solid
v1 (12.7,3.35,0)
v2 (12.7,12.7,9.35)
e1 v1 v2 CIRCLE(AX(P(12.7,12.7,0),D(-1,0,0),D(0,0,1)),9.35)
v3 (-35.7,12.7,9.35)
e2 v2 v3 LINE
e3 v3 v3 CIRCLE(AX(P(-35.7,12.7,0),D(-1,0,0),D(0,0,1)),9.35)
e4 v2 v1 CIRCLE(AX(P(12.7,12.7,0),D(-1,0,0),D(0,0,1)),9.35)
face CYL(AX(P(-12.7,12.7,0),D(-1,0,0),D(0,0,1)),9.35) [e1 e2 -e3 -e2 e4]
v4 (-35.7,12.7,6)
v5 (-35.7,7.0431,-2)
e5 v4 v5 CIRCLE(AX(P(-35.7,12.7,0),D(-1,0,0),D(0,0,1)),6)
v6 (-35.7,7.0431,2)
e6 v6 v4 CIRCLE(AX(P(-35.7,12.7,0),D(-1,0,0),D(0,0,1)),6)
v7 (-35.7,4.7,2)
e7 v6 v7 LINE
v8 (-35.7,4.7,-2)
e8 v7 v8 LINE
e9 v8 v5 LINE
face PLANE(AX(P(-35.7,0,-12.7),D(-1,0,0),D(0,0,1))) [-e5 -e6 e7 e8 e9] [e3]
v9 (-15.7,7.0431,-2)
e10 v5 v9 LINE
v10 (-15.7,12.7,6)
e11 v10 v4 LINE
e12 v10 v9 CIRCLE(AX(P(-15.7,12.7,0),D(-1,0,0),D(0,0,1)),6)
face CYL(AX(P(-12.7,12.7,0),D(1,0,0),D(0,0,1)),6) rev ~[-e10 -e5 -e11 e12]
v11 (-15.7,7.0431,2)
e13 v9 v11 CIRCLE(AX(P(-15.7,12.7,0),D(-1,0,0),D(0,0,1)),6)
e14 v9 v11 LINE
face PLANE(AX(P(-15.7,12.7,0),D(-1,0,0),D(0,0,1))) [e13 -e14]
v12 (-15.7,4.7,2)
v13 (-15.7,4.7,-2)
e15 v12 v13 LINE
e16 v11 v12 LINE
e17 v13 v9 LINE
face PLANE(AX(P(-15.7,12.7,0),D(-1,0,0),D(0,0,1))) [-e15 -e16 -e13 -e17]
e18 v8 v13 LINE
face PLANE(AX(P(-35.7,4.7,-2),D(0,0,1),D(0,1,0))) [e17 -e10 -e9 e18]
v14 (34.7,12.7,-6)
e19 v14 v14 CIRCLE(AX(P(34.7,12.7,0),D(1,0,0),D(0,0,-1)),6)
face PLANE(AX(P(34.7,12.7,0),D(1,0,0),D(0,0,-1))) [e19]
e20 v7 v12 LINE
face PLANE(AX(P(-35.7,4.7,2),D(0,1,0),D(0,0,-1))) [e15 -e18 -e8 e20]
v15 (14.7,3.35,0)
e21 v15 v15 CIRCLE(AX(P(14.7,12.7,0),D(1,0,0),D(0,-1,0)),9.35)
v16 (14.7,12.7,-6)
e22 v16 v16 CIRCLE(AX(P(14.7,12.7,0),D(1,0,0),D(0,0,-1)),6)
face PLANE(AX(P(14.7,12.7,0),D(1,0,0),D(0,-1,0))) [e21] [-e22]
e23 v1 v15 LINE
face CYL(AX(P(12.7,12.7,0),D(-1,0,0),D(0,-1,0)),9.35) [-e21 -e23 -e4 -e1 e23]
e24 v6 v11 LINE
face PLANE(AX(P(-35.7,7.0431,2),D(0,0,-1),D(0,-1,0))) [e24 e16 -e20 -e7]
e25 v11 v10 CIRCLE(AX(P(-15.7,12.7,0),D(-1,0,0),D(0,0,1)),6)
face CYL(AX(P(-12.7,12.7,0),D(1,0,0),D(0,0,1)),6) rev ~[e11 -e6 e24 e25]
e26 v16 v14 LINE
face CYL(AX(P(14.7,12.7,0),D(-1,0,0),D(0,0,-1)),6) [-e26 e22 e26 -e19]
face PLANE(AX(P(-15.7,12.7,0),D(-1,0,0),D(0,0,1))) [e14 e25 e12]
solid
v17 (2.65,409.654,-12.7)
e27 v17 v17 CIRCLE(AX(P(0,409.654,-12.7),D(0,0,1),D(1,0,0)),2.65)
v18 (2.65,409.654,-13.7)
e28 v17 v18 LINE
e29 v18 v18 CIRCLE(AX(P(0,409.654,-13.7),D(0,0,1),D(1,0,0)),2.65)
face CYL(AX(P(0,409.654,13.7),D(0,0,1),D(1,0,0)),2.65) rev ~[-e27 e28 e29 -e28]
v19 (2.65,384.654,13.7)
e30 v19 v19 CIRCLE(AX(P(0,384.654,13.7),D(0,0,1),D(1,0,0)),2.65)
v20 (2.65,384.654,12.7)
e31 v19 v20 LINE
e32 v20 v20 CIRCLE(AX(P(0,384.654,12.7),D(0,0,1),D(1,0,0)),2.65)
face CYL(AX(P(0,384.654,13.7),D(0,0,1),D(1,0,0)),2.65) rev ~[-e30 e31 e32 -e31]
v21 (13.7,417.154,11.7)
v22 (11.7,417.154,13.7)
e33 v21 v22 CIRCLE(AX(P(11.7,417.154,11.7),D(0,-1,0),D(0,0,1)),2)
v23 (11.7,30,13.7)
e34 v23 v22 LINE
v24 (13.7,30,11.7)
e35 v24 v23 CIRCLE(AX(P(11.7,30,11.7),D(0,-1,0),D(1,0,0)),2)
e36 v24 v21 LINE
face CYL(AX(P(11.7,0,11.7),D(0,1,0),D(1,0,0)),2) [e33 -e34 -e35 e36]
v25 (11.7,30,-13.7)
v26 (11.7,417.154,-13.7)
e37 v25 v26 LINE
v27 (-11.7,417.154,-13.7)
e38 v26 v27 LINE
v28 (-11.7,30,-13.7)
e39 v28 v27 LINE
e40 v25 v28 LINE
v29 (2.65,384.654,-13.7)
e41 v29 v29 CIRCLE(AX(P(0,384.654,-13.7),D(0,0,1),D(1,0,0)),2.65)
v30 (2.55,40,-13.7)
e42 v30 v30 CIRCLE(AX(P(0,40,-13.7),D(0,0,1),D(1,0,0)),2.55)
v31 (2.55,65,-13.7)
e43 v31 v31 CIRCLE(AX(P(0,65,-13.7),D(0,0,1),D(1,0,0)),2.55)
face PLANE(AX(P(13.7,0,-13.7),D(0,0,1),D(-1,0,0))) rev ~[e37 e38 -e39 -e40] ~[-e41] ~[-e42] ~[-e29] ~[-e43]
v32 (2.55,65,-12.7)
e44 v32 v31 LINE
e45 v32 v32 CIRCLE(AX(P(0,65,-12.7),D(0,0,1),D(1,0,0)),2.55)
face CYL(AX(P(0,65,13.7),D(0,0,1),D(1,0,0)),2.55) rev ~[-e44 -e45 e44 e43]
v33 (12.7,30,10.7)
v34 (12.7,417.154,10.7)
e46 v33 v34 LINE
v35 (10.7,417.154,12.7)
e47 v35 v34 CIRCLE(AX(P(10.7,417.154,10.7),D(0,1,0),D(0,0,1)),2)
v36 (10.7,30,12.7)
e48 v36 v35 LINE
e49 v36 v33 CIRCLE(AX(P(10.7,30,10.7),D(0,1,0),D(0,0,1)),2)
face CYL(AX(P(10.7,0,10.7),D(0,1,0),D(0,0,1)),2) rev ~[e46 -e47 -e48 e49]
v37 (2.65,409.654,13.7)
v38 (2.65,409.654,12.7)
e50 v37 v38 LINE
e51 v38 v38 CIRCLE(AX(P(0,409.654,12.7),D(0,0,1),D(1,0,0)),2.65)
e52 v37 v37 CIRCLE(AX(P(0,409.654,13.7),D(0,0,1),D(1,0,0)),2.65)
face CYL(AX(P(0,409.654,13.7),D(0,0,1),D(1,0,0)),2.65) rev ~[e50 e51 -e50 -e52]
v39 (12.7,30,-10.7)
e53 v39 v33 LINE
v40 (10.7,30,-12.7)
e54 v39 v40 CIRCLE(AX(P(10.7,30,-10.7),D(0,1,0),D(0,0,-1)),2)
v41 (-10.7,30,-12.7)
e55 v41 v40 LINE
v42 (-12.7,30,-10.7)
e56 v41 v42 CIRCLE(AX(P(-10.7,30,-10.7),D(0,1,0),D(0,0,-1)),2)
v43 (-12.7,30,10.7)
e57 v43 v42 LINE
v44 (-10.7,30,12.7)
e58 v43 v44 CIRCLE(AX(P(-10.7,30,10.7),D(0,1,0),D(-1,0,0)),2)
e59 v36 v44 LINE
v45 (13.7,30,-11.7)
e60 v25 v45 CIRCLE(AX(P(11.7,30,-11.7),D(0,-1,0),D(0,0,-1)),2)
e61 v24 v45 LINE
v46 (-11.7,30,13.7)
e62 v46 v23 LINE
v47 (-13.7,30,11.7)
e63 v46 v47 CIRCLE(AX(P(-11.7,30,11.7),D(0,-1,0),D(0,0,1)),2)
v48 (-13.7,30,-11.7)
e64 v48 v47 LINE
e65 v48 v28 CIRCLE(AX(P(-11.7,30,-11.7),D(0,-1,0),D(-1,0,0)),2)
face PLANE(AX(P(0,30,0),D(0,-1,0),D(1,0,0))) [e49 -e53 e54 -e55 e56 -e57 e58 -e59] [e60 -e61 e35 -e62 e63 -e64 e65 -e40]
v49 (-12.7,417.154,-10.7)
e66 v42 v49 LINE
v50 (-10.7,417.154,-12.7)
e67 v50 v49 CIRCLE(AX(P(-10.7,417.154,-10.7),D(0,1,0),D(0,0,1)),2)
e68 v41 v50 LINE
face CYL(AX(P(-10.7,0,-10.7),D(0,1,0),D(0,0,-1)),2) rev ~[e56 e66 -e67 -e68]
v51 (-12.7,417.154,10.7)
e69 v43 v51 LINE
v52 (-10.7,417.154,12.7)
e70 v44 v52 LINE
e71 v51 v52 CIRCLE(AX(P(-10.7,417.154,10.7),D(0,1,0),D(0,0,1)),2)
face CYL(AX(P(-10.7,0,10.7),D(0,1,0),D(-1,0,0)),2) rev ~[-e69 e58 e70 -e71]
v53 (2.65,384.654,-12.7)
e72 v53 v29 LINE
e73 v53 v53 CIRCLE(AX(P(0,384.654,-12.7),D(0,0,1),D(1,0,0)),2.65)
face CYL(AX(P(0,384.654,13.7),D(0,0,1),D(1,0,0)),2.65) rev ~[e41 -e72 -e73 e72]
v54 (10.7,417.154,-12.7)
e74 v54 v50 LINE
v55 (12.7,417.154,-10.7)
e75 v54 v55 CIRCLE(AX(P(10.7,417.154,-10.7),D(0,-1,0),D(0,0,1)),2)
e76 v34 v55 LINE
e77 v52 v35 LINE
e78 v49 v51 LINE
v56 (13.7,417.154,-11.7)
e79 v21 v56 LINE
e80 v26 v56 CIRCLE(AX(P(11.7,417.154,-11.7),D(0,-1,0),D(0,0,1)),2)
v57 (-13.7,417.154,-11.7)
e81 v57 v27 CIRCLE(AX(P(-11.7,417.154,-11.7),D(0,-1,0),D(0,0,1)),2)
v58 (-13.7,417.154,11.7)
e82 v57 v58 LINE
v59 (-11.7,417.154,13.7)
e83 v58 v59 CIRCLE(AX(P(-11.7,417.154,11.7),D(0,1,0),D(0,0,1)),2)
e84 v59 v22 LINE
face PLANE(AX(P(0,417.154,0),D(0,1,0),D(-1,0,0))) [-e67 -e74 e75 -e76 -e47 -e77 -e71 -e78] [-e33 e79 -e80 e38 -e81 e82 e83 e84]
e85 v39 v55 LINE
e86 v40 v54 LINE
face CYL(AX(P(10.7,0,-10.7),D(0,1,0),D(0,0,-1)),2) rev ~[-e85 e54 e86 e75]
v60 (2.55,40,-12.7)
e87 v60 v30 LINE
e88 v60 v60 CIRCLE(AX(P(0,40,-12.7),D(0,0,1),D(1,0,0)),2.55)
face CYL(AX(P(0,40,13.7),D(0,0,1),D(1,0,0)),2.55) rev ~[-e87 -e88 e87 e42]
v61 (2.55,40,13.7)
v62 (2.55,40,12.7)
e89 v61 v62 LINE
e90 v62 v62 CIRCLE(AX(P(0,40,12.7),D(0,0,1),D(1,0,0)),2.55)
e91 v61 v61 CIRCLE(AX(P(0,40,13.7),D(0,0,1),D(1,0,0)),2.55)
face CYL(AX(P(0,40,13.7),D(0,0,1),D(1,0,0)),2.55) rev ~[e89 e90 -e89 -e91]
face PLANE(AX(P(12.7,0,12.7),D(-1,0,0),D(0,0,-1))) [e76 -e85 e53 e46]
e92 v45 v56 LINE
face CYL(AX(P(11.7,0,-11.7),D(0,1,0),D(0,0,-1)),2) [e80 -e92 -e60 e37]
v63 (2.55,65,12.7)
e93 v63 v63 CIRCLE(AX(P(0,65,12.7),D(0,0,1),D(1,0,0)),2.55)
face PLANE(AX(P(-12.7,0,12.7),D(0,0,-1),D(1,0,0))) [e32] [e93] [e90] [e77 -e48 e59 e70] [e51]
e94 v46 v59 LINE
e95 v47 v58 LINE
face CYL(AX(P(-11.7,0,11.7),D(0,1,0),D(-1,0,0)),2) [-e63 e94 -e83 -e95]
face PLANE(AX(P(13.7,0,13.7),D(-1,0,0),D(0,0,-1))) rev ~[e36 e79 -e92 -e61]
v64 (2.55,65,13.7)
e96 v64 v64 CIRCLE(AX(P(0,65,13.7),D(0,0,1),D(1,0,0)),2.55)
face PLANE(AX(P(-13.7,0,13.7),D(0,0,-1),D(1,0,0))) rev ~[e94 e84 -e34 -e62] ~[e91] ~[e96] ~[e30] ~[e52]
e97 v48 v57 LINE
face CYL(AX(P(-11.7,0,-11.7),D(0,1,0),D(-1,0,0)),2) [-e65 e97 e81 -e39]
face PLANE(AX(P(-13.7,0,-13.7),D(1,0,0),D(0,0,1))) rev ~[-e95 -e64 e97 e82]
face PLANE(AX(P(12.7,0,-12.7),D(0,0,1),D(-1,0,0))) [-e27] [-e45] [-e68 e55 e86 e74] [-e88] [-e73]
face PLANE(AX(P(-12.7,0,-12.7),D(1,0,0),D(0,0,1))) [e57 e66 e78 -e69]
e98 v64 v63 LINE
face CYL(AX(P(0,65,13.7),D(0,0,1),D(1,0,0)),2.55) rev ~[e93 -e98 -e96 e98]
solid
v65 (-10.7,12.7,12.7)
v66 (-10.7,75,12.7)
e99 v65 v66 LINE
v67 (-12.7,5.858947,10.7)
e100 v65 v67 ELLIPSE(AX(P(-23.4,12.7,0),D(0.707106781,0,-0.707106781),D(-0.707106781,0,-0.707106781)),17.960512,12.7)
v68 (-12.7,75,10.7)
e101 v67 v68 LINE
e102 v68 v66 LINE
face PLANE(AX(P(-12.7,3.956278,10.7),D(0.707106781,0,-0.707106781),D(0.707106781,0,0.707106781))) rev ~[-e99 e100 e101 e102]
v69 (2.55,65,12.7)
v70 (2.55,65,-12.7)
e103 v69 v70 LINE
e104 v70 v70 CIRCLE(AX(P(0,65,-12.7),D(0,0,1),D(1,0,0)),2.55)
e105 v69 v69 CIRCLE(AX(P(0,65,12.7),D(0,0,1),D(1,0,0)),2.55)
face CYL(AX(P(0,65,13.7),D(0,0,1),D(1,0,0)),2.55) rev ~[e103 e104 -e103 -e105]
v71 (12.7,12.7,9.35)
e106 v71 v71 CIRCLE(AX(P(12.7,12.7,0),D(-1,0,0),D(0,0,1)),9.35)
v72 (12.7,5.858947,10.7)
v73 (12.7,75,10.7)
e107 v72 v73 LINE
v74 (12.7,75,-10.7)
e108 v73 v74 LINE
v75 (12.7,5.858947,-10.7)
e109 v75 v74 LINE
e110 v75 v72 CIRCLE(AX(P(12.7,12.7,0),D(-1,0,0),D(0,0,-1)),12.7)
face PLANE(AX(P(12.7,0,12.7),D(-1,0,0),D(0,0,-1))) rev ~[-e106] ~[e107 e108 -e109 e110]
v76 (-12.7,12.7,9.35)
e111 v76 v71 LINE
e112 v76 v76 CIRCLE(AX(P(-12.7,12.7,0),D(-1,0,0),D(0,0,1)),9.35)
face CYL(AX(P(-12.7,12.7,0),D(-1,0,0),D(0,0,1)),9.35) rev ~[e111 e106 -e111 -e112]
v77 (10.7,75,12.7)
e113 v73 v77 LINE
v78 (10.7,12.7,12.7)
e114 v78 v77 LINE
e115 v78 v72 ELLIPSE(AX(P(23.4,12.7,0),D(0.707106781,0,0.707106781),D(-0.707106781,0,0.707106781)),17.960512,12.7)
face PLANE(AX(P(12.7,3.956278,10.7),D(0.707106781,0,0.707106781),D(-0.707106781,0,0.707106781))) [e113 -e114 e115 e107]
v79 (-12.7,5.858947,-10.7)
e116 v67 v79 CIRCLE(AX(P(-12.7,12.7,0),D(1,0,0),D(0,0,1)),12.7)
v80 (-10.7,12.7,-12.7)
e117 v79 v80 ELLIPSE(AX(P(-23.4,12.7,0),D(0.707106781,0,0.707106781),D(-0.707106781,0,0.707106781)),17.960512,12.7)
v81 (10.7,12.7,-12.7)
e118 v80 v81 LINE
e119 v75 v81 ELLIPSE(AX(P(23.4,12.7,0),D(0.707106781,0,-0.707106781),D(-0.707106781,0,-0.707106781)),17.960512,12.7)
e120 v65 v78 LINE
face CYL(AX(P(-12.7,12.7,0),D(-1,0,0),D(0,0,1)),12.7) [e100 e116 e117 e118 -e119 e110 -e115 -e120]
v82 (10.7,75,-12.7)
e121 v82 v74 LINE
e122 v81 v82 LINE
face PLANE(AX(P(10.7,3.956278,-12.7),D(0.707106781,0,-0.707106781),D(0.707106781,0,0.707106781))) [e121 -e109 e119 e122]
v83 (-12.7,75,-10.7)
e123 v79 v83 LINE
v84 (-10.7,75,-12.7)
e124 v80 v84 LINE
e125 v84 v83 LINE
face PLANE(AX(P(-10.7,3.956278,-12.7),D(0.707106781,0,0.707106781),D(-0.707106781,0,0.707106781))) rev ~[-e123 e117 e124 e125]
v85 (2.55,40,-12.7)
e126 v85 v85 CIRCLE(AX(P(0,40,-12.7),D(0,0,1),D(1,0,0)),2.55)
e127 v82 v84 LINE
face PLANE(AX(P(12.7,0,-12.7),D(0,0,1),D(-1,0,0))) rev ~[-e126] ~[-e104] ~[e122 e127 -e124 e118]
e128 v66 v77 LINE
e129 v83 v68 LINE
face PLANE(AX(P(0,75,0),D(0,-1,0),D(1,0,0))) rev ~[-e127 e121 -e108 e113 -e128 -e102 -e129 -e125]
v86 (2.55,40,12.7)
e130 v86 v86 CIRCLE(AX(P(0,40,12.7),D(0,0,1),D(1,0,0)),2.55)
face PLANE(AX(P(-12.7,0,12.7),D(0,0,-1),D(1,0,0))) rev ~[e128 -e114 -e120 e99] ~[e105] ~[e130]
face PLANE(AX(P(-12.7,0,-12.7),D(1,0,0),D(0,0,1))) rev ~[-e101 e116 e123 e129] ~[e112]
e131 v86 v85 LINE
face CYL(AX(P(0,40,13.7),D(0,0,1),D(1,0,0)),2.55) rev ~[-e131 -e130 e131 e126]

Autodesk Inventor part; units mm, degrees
ref_plane "YZ Plane" through (0, 0, 0) normal (1, 0, 0) x (0, 1, 0)
ref_plane "XZ Plane" through (0, 0, 0) normal (0, 1, 0) x (-1, 0, 0)
sketch "Sketch1" plane through (0, 0, 0) normal (0, 1, 0) x (-1, 0, 0)
  line L0 (13.7, 13.7) -> (-13.7, 13.7)
  line L1 (-13.7, 13.7) -> (-13.7, -13.7)
  line L2 (-13.7, -13.7) -> (13.7, -13.7)
  line L3 (13.7, -13.7) -> (13.7, 13.7)
  line L4 (13.7, 13.7) -> (-13.7, -13.7) construction
  line L5 (-13.7, 13.7) -> (13.7, -13.7) construction
  line L6 (-12.7, -12.7) -> (12.7, -12.7)
  line L7 (12.7, -12.7) -> (12.7, 12.7)
  line L8 (12.7, 12.7) -> (-12.7, 12.7)
  line L9 (-12.7, 12.7) -> (-12.7, -12.7)
  line L10 (-12.7, -12.7) -> (12.7, 12.7) construction
  line L11 (12.7, -12.7) -> (-12.7, 12.7) construction
  point P0 (0, 0)
  dimension "d1" = 1
  dimension "d35" = 25.4
extrude "Extrusion1" add sketch "Sketch1" along normal blind 417.154
fillet "Fillet1" radius 2 8 edges at (-12.7, 208.577, 12.7) (13.7, 208.577, -13.7) (-13.7, 208.577, -13.7) (12.7, 208.577, -12.7) (-12.7, 208.577, -12.7) (12.7, 208.577, 12.7) (13.7, 208.577, 13.7) (-13.7, 208.577, 13.7)
ref_plane "Work Plane1" through (-13.7, 417.154, 13.7) normal (0, 0.7504226, 0.6609583) x (1, 0, 0)
sketch "Sketch4" plane through (0, 0, 0) normal (0, -1, 0) x (1, 0, 0)
  line L0 (12.7, -12.7) -> (-12.7, -12.7)
  line L1 (-12.7, -12.7) -> (-12.7, 12.7)
  line L2 (-12.7, 12.7) -> (12.7, 12.7)
  line L3 (12.7, 12.7) -> (12.7, -12.7)
  line L4 (12.7, -12.7) -> (-12.7, 12.7) construction
  line L5 (-12.7, -12.7) -> (12.7, 12.7) construction
  line L6 (12.7, 12.7) -> (-12.7, 12.7) projected
  point P0 (0, 0)
  dimension "d9" = 0
extrude "Extrusion3" add sketch "Sketch4" against normal blind 75 separate body
sketch "Sketch6" plane through (0, 0, 0) normal (0, -1, 0) x (1, 0, 0)
  line L0 (13.7, 11.7) -> (13.7, -11.7) projected
  line L1 (-11.7, 13.7) -> (11.7, 13.7) projected
  line L2 (-13.7, -11.7) -> (-13.7, 11.7) projected
  line L3 (11.7, -13.7) -> (-11.7, -13.7) projected
  line L4 (12.7, -10.7) -> (12.7, 10.7) projected
  line L5 (-10.7, -12.7) -> (10.7, -12.7) projected
  line L6 (-12.7, 10.7) -> (-12.7, -10.7) projected
  line L7 (10.7, 12.7) -> (-10.7, 12.7) projected
  arc A0 (-11.7, 13.7) -> (-13.7, 11.7) centre (-11.7, 11.7) ccw projected
  arc A1 (-13.7, -11.7) -> (-11.7, -13.7) centre (-11.7, -11.7) ccw projected
  arc A2 (11.7, -13.7) -> (13.7, -11.7) centre (11.7, -11.7) ccw projected
  arc A3 (13.7, 11.7) -> (11.7, 13.7) centre (11.7, 11.7) ccw projected
  arc A4 (10.7, -12.7) -> (12.7, -10.7) centre (10.7, -10.7) ccw projected
  arc A5 (-12.7, -10.7) -> (-10.7, -12.7) centre (-10.7, -10.7) ccw projected
  arc A6 (-10.7, 12.7) -> (-12.7, 10.7) centre (-10.7, 10.7) ccw projected
  arc A7 (12.7, 10.7) -> (10.7, 12.7) centre (10.7, 10.7) ccw projected
  point P0 (0, 0)
extrude "Extrusion5" cut sketch "Sketch6" against normal blind 30 contours L0 A2 L3 A1 L2 A0 L1 A3 | A4 L5 A5 L6 A6 L7 A7 L4 bodies 1
sketch "Sketch7" plane through (-13.7, 417.154, 13.7) normal (0, 0, 1) x (1, 0, 0)
  line L0 (13.7, -377.154) -> (13.7, -352.154) construction
  line L1 (13.7, -352.154) -> (13.7, -342.154) construction
  line L2 (13.7, -377.154) -> (13.7, -387.154) construction
  circle A0 centre (13.7, -352.154) radius 2.55
  circle A1 centre (13.7, -377.154) radius 2.55
  line L3 (1, -342.154) -> (26.4, -342.154) projected
  line L4 (2, -387.154) -> (25.4, -387.154) projected
  point P0 (0, -299.6)
  point P1 (27.4, -299.6)
  dimension "d20" = 5.1
  dimension "d21" = 10
extrude "Extrusion6" cut sketch "Sketch7" against normal through all bodies 1 2
sketch "Sketch8" plane through (-13.7, 417.154, 13.7) normal (0, 0, 1) x (1, 0, 0)
  line L0 (27.4, 0) -> (0, 0) projected
  line L1 (13.7, 0) -> (13.7, -7.5) construction
  line L2 (13.7, -7.5) -> (13.7, -32.5) construction
  circle A0 centre (13.7, -7.5) radius 2.65
  circle A1 centre (13.7, -32.5) radius 2.65
  point P0 (13.7, -417.154)
  point P1 (27.4, -299.6)
  point P2 (0, -299.6)
  dimension "d26" = 7.5
  dimension "d27" = 25
  dimension "d28" = 5.3
  dimension "d29" = 5.3
extrude "Extrusion7" cut sketch "Sketch8" against normal through all bodies 1
sketch "Sketch13" plane through (-12.7, 0, -12.7) normal (-1, 0, 0) x (0, 0, 1)
  line L0 (0, 0) -> (0, 75) projected
  line L1 (25.4, 0) -> (0, 0) projected
  line L2 (25.4, 0) -> (25.4, 75) projected
  circle A0 centre (12.7, 12.7) radius 6 construction
  circle A1 centre (12.7, 12.7) radius 9.35
  circle A2 centre (12.7, 12.7) radius 12.7
  line L3 (12.7, 12.7) -> (6.7, 12.7) construction
  line L4 (3.35, 12.7) -> (0, 12.7) construction
  line L5 (0, 0) -> (0, 75) projected
  line L6 (3.35, 12.7) -> (6.7, 12.7) construction
  point P0 (12.7, 0)
  point P1 (6.1952, 0)
  point P2 (25.4, 12.7)
  point P3 (12.7, 0)
  point P4 (5.5838, 6.6351)
  point P5 (19.8162, 6.6351)
  point P6 (19.8162, 18.7649)
  point P7 (5.5838, 18.7649)
  dimension "d58" = 12
  dimension "d68" = 3.35
extrude "Extrusion14" cut sketch "Sketch13" against normal through all contours L0 A2 L1 | A2 L2 L1 | A1 bodies 2
extrude "Extrusion15" add sketch "Sketch13" against normal up to surface (25.4 mm away) separate body contours A1
sketch "Sketch15" plane through (-12.7, 0, -12.7) normal (-1, 0, 0) x (0, 0, 1)
  circle A0 centre (12.7, 12.7) radius 9.35 projected
  circle A1 centre (12.7, 12.7) radius 9.35
  circle A2 centre (12.7, 12.7) radius 6
  point P0 (12.7, 0)
  point P1 (19.5401, 6.5)
  point P2 (22.05, 12.7)
  dimension "d70" = 12
extrude "Extrusion16" add sketch "Sketch15" along normal blind 23 bodies 3
sketch "Sketch16" plane through (-12.7, 12.7, 0) normal (-1, 0, 0) x (0, 0, 1)
  circle A0 centre (0, 0) radius 6 projected
  point P0 (0, -12.7)
extrude "Extrusion17" add sketch "Sketch16" along normal blind 3 bodies 3
sketch "Sketch19" plane through (12.7, 12.7, 0) normal (1, 0, 0) x (0, -1, 0)
  circle A0 centre (0, 0) radius 9.35 projected
  point P0 (12.7, 0)
extrude "Extrusion20" add sketch "Sketch19" along normal blind 2 bodies 3
sketch "Sketch17" plane through (14.7, 12.7, 0) normal (1, 0, 0) x (0, 0, -1)
  circle A0 centre (0, 0) radius 6
  point P0 (0, -12.7)
  dimension "d75" = 12
extrude "Extrusion18" add sketch "Sketch17" along normal blind 20 bodies 3
sketch "Sketch18" plane through (-35.7, 12.7, 0) normal (-1, 0, 0) x (0, 0, 1)
  circle A0 centre (0, 0) radius 6 projected
  line L0 (-2, -5.6569) -> (2, -5.6569)
  line L1 (2, -5.6569) -> (2, -8)
  line L2 (2, -8) -> (-2, -8)
  line L3 (-2, -8) -> (-2, -5.6569)
  line L4 (0, -5.6569) -> (0, -6) construction
  point P0 (0, -12.7)
  point P1 (-1.94, -6.1429)
  point P2 (-1.94, -6.1429)
  dimension "d85" = 4
  dimension "d97" = 2
extrude "Extrusion19" cut sketch "Sketch18" against normal up to surface (20 mm away) contours L0 A0 | A0 L1 L2 L3 picked at (-0.2261, -5.7584) bodies 3
chamfer "Chamfer1" distance 2 angle 45 4 edges at (12.7, 43.85, 12.7) (-12.7, 43.85, 12.7) (12.7, 43.85, -12.7) (-12.7, 43.85, -12.7)
properties part number "Brazo" material "Aluminum 6061"
